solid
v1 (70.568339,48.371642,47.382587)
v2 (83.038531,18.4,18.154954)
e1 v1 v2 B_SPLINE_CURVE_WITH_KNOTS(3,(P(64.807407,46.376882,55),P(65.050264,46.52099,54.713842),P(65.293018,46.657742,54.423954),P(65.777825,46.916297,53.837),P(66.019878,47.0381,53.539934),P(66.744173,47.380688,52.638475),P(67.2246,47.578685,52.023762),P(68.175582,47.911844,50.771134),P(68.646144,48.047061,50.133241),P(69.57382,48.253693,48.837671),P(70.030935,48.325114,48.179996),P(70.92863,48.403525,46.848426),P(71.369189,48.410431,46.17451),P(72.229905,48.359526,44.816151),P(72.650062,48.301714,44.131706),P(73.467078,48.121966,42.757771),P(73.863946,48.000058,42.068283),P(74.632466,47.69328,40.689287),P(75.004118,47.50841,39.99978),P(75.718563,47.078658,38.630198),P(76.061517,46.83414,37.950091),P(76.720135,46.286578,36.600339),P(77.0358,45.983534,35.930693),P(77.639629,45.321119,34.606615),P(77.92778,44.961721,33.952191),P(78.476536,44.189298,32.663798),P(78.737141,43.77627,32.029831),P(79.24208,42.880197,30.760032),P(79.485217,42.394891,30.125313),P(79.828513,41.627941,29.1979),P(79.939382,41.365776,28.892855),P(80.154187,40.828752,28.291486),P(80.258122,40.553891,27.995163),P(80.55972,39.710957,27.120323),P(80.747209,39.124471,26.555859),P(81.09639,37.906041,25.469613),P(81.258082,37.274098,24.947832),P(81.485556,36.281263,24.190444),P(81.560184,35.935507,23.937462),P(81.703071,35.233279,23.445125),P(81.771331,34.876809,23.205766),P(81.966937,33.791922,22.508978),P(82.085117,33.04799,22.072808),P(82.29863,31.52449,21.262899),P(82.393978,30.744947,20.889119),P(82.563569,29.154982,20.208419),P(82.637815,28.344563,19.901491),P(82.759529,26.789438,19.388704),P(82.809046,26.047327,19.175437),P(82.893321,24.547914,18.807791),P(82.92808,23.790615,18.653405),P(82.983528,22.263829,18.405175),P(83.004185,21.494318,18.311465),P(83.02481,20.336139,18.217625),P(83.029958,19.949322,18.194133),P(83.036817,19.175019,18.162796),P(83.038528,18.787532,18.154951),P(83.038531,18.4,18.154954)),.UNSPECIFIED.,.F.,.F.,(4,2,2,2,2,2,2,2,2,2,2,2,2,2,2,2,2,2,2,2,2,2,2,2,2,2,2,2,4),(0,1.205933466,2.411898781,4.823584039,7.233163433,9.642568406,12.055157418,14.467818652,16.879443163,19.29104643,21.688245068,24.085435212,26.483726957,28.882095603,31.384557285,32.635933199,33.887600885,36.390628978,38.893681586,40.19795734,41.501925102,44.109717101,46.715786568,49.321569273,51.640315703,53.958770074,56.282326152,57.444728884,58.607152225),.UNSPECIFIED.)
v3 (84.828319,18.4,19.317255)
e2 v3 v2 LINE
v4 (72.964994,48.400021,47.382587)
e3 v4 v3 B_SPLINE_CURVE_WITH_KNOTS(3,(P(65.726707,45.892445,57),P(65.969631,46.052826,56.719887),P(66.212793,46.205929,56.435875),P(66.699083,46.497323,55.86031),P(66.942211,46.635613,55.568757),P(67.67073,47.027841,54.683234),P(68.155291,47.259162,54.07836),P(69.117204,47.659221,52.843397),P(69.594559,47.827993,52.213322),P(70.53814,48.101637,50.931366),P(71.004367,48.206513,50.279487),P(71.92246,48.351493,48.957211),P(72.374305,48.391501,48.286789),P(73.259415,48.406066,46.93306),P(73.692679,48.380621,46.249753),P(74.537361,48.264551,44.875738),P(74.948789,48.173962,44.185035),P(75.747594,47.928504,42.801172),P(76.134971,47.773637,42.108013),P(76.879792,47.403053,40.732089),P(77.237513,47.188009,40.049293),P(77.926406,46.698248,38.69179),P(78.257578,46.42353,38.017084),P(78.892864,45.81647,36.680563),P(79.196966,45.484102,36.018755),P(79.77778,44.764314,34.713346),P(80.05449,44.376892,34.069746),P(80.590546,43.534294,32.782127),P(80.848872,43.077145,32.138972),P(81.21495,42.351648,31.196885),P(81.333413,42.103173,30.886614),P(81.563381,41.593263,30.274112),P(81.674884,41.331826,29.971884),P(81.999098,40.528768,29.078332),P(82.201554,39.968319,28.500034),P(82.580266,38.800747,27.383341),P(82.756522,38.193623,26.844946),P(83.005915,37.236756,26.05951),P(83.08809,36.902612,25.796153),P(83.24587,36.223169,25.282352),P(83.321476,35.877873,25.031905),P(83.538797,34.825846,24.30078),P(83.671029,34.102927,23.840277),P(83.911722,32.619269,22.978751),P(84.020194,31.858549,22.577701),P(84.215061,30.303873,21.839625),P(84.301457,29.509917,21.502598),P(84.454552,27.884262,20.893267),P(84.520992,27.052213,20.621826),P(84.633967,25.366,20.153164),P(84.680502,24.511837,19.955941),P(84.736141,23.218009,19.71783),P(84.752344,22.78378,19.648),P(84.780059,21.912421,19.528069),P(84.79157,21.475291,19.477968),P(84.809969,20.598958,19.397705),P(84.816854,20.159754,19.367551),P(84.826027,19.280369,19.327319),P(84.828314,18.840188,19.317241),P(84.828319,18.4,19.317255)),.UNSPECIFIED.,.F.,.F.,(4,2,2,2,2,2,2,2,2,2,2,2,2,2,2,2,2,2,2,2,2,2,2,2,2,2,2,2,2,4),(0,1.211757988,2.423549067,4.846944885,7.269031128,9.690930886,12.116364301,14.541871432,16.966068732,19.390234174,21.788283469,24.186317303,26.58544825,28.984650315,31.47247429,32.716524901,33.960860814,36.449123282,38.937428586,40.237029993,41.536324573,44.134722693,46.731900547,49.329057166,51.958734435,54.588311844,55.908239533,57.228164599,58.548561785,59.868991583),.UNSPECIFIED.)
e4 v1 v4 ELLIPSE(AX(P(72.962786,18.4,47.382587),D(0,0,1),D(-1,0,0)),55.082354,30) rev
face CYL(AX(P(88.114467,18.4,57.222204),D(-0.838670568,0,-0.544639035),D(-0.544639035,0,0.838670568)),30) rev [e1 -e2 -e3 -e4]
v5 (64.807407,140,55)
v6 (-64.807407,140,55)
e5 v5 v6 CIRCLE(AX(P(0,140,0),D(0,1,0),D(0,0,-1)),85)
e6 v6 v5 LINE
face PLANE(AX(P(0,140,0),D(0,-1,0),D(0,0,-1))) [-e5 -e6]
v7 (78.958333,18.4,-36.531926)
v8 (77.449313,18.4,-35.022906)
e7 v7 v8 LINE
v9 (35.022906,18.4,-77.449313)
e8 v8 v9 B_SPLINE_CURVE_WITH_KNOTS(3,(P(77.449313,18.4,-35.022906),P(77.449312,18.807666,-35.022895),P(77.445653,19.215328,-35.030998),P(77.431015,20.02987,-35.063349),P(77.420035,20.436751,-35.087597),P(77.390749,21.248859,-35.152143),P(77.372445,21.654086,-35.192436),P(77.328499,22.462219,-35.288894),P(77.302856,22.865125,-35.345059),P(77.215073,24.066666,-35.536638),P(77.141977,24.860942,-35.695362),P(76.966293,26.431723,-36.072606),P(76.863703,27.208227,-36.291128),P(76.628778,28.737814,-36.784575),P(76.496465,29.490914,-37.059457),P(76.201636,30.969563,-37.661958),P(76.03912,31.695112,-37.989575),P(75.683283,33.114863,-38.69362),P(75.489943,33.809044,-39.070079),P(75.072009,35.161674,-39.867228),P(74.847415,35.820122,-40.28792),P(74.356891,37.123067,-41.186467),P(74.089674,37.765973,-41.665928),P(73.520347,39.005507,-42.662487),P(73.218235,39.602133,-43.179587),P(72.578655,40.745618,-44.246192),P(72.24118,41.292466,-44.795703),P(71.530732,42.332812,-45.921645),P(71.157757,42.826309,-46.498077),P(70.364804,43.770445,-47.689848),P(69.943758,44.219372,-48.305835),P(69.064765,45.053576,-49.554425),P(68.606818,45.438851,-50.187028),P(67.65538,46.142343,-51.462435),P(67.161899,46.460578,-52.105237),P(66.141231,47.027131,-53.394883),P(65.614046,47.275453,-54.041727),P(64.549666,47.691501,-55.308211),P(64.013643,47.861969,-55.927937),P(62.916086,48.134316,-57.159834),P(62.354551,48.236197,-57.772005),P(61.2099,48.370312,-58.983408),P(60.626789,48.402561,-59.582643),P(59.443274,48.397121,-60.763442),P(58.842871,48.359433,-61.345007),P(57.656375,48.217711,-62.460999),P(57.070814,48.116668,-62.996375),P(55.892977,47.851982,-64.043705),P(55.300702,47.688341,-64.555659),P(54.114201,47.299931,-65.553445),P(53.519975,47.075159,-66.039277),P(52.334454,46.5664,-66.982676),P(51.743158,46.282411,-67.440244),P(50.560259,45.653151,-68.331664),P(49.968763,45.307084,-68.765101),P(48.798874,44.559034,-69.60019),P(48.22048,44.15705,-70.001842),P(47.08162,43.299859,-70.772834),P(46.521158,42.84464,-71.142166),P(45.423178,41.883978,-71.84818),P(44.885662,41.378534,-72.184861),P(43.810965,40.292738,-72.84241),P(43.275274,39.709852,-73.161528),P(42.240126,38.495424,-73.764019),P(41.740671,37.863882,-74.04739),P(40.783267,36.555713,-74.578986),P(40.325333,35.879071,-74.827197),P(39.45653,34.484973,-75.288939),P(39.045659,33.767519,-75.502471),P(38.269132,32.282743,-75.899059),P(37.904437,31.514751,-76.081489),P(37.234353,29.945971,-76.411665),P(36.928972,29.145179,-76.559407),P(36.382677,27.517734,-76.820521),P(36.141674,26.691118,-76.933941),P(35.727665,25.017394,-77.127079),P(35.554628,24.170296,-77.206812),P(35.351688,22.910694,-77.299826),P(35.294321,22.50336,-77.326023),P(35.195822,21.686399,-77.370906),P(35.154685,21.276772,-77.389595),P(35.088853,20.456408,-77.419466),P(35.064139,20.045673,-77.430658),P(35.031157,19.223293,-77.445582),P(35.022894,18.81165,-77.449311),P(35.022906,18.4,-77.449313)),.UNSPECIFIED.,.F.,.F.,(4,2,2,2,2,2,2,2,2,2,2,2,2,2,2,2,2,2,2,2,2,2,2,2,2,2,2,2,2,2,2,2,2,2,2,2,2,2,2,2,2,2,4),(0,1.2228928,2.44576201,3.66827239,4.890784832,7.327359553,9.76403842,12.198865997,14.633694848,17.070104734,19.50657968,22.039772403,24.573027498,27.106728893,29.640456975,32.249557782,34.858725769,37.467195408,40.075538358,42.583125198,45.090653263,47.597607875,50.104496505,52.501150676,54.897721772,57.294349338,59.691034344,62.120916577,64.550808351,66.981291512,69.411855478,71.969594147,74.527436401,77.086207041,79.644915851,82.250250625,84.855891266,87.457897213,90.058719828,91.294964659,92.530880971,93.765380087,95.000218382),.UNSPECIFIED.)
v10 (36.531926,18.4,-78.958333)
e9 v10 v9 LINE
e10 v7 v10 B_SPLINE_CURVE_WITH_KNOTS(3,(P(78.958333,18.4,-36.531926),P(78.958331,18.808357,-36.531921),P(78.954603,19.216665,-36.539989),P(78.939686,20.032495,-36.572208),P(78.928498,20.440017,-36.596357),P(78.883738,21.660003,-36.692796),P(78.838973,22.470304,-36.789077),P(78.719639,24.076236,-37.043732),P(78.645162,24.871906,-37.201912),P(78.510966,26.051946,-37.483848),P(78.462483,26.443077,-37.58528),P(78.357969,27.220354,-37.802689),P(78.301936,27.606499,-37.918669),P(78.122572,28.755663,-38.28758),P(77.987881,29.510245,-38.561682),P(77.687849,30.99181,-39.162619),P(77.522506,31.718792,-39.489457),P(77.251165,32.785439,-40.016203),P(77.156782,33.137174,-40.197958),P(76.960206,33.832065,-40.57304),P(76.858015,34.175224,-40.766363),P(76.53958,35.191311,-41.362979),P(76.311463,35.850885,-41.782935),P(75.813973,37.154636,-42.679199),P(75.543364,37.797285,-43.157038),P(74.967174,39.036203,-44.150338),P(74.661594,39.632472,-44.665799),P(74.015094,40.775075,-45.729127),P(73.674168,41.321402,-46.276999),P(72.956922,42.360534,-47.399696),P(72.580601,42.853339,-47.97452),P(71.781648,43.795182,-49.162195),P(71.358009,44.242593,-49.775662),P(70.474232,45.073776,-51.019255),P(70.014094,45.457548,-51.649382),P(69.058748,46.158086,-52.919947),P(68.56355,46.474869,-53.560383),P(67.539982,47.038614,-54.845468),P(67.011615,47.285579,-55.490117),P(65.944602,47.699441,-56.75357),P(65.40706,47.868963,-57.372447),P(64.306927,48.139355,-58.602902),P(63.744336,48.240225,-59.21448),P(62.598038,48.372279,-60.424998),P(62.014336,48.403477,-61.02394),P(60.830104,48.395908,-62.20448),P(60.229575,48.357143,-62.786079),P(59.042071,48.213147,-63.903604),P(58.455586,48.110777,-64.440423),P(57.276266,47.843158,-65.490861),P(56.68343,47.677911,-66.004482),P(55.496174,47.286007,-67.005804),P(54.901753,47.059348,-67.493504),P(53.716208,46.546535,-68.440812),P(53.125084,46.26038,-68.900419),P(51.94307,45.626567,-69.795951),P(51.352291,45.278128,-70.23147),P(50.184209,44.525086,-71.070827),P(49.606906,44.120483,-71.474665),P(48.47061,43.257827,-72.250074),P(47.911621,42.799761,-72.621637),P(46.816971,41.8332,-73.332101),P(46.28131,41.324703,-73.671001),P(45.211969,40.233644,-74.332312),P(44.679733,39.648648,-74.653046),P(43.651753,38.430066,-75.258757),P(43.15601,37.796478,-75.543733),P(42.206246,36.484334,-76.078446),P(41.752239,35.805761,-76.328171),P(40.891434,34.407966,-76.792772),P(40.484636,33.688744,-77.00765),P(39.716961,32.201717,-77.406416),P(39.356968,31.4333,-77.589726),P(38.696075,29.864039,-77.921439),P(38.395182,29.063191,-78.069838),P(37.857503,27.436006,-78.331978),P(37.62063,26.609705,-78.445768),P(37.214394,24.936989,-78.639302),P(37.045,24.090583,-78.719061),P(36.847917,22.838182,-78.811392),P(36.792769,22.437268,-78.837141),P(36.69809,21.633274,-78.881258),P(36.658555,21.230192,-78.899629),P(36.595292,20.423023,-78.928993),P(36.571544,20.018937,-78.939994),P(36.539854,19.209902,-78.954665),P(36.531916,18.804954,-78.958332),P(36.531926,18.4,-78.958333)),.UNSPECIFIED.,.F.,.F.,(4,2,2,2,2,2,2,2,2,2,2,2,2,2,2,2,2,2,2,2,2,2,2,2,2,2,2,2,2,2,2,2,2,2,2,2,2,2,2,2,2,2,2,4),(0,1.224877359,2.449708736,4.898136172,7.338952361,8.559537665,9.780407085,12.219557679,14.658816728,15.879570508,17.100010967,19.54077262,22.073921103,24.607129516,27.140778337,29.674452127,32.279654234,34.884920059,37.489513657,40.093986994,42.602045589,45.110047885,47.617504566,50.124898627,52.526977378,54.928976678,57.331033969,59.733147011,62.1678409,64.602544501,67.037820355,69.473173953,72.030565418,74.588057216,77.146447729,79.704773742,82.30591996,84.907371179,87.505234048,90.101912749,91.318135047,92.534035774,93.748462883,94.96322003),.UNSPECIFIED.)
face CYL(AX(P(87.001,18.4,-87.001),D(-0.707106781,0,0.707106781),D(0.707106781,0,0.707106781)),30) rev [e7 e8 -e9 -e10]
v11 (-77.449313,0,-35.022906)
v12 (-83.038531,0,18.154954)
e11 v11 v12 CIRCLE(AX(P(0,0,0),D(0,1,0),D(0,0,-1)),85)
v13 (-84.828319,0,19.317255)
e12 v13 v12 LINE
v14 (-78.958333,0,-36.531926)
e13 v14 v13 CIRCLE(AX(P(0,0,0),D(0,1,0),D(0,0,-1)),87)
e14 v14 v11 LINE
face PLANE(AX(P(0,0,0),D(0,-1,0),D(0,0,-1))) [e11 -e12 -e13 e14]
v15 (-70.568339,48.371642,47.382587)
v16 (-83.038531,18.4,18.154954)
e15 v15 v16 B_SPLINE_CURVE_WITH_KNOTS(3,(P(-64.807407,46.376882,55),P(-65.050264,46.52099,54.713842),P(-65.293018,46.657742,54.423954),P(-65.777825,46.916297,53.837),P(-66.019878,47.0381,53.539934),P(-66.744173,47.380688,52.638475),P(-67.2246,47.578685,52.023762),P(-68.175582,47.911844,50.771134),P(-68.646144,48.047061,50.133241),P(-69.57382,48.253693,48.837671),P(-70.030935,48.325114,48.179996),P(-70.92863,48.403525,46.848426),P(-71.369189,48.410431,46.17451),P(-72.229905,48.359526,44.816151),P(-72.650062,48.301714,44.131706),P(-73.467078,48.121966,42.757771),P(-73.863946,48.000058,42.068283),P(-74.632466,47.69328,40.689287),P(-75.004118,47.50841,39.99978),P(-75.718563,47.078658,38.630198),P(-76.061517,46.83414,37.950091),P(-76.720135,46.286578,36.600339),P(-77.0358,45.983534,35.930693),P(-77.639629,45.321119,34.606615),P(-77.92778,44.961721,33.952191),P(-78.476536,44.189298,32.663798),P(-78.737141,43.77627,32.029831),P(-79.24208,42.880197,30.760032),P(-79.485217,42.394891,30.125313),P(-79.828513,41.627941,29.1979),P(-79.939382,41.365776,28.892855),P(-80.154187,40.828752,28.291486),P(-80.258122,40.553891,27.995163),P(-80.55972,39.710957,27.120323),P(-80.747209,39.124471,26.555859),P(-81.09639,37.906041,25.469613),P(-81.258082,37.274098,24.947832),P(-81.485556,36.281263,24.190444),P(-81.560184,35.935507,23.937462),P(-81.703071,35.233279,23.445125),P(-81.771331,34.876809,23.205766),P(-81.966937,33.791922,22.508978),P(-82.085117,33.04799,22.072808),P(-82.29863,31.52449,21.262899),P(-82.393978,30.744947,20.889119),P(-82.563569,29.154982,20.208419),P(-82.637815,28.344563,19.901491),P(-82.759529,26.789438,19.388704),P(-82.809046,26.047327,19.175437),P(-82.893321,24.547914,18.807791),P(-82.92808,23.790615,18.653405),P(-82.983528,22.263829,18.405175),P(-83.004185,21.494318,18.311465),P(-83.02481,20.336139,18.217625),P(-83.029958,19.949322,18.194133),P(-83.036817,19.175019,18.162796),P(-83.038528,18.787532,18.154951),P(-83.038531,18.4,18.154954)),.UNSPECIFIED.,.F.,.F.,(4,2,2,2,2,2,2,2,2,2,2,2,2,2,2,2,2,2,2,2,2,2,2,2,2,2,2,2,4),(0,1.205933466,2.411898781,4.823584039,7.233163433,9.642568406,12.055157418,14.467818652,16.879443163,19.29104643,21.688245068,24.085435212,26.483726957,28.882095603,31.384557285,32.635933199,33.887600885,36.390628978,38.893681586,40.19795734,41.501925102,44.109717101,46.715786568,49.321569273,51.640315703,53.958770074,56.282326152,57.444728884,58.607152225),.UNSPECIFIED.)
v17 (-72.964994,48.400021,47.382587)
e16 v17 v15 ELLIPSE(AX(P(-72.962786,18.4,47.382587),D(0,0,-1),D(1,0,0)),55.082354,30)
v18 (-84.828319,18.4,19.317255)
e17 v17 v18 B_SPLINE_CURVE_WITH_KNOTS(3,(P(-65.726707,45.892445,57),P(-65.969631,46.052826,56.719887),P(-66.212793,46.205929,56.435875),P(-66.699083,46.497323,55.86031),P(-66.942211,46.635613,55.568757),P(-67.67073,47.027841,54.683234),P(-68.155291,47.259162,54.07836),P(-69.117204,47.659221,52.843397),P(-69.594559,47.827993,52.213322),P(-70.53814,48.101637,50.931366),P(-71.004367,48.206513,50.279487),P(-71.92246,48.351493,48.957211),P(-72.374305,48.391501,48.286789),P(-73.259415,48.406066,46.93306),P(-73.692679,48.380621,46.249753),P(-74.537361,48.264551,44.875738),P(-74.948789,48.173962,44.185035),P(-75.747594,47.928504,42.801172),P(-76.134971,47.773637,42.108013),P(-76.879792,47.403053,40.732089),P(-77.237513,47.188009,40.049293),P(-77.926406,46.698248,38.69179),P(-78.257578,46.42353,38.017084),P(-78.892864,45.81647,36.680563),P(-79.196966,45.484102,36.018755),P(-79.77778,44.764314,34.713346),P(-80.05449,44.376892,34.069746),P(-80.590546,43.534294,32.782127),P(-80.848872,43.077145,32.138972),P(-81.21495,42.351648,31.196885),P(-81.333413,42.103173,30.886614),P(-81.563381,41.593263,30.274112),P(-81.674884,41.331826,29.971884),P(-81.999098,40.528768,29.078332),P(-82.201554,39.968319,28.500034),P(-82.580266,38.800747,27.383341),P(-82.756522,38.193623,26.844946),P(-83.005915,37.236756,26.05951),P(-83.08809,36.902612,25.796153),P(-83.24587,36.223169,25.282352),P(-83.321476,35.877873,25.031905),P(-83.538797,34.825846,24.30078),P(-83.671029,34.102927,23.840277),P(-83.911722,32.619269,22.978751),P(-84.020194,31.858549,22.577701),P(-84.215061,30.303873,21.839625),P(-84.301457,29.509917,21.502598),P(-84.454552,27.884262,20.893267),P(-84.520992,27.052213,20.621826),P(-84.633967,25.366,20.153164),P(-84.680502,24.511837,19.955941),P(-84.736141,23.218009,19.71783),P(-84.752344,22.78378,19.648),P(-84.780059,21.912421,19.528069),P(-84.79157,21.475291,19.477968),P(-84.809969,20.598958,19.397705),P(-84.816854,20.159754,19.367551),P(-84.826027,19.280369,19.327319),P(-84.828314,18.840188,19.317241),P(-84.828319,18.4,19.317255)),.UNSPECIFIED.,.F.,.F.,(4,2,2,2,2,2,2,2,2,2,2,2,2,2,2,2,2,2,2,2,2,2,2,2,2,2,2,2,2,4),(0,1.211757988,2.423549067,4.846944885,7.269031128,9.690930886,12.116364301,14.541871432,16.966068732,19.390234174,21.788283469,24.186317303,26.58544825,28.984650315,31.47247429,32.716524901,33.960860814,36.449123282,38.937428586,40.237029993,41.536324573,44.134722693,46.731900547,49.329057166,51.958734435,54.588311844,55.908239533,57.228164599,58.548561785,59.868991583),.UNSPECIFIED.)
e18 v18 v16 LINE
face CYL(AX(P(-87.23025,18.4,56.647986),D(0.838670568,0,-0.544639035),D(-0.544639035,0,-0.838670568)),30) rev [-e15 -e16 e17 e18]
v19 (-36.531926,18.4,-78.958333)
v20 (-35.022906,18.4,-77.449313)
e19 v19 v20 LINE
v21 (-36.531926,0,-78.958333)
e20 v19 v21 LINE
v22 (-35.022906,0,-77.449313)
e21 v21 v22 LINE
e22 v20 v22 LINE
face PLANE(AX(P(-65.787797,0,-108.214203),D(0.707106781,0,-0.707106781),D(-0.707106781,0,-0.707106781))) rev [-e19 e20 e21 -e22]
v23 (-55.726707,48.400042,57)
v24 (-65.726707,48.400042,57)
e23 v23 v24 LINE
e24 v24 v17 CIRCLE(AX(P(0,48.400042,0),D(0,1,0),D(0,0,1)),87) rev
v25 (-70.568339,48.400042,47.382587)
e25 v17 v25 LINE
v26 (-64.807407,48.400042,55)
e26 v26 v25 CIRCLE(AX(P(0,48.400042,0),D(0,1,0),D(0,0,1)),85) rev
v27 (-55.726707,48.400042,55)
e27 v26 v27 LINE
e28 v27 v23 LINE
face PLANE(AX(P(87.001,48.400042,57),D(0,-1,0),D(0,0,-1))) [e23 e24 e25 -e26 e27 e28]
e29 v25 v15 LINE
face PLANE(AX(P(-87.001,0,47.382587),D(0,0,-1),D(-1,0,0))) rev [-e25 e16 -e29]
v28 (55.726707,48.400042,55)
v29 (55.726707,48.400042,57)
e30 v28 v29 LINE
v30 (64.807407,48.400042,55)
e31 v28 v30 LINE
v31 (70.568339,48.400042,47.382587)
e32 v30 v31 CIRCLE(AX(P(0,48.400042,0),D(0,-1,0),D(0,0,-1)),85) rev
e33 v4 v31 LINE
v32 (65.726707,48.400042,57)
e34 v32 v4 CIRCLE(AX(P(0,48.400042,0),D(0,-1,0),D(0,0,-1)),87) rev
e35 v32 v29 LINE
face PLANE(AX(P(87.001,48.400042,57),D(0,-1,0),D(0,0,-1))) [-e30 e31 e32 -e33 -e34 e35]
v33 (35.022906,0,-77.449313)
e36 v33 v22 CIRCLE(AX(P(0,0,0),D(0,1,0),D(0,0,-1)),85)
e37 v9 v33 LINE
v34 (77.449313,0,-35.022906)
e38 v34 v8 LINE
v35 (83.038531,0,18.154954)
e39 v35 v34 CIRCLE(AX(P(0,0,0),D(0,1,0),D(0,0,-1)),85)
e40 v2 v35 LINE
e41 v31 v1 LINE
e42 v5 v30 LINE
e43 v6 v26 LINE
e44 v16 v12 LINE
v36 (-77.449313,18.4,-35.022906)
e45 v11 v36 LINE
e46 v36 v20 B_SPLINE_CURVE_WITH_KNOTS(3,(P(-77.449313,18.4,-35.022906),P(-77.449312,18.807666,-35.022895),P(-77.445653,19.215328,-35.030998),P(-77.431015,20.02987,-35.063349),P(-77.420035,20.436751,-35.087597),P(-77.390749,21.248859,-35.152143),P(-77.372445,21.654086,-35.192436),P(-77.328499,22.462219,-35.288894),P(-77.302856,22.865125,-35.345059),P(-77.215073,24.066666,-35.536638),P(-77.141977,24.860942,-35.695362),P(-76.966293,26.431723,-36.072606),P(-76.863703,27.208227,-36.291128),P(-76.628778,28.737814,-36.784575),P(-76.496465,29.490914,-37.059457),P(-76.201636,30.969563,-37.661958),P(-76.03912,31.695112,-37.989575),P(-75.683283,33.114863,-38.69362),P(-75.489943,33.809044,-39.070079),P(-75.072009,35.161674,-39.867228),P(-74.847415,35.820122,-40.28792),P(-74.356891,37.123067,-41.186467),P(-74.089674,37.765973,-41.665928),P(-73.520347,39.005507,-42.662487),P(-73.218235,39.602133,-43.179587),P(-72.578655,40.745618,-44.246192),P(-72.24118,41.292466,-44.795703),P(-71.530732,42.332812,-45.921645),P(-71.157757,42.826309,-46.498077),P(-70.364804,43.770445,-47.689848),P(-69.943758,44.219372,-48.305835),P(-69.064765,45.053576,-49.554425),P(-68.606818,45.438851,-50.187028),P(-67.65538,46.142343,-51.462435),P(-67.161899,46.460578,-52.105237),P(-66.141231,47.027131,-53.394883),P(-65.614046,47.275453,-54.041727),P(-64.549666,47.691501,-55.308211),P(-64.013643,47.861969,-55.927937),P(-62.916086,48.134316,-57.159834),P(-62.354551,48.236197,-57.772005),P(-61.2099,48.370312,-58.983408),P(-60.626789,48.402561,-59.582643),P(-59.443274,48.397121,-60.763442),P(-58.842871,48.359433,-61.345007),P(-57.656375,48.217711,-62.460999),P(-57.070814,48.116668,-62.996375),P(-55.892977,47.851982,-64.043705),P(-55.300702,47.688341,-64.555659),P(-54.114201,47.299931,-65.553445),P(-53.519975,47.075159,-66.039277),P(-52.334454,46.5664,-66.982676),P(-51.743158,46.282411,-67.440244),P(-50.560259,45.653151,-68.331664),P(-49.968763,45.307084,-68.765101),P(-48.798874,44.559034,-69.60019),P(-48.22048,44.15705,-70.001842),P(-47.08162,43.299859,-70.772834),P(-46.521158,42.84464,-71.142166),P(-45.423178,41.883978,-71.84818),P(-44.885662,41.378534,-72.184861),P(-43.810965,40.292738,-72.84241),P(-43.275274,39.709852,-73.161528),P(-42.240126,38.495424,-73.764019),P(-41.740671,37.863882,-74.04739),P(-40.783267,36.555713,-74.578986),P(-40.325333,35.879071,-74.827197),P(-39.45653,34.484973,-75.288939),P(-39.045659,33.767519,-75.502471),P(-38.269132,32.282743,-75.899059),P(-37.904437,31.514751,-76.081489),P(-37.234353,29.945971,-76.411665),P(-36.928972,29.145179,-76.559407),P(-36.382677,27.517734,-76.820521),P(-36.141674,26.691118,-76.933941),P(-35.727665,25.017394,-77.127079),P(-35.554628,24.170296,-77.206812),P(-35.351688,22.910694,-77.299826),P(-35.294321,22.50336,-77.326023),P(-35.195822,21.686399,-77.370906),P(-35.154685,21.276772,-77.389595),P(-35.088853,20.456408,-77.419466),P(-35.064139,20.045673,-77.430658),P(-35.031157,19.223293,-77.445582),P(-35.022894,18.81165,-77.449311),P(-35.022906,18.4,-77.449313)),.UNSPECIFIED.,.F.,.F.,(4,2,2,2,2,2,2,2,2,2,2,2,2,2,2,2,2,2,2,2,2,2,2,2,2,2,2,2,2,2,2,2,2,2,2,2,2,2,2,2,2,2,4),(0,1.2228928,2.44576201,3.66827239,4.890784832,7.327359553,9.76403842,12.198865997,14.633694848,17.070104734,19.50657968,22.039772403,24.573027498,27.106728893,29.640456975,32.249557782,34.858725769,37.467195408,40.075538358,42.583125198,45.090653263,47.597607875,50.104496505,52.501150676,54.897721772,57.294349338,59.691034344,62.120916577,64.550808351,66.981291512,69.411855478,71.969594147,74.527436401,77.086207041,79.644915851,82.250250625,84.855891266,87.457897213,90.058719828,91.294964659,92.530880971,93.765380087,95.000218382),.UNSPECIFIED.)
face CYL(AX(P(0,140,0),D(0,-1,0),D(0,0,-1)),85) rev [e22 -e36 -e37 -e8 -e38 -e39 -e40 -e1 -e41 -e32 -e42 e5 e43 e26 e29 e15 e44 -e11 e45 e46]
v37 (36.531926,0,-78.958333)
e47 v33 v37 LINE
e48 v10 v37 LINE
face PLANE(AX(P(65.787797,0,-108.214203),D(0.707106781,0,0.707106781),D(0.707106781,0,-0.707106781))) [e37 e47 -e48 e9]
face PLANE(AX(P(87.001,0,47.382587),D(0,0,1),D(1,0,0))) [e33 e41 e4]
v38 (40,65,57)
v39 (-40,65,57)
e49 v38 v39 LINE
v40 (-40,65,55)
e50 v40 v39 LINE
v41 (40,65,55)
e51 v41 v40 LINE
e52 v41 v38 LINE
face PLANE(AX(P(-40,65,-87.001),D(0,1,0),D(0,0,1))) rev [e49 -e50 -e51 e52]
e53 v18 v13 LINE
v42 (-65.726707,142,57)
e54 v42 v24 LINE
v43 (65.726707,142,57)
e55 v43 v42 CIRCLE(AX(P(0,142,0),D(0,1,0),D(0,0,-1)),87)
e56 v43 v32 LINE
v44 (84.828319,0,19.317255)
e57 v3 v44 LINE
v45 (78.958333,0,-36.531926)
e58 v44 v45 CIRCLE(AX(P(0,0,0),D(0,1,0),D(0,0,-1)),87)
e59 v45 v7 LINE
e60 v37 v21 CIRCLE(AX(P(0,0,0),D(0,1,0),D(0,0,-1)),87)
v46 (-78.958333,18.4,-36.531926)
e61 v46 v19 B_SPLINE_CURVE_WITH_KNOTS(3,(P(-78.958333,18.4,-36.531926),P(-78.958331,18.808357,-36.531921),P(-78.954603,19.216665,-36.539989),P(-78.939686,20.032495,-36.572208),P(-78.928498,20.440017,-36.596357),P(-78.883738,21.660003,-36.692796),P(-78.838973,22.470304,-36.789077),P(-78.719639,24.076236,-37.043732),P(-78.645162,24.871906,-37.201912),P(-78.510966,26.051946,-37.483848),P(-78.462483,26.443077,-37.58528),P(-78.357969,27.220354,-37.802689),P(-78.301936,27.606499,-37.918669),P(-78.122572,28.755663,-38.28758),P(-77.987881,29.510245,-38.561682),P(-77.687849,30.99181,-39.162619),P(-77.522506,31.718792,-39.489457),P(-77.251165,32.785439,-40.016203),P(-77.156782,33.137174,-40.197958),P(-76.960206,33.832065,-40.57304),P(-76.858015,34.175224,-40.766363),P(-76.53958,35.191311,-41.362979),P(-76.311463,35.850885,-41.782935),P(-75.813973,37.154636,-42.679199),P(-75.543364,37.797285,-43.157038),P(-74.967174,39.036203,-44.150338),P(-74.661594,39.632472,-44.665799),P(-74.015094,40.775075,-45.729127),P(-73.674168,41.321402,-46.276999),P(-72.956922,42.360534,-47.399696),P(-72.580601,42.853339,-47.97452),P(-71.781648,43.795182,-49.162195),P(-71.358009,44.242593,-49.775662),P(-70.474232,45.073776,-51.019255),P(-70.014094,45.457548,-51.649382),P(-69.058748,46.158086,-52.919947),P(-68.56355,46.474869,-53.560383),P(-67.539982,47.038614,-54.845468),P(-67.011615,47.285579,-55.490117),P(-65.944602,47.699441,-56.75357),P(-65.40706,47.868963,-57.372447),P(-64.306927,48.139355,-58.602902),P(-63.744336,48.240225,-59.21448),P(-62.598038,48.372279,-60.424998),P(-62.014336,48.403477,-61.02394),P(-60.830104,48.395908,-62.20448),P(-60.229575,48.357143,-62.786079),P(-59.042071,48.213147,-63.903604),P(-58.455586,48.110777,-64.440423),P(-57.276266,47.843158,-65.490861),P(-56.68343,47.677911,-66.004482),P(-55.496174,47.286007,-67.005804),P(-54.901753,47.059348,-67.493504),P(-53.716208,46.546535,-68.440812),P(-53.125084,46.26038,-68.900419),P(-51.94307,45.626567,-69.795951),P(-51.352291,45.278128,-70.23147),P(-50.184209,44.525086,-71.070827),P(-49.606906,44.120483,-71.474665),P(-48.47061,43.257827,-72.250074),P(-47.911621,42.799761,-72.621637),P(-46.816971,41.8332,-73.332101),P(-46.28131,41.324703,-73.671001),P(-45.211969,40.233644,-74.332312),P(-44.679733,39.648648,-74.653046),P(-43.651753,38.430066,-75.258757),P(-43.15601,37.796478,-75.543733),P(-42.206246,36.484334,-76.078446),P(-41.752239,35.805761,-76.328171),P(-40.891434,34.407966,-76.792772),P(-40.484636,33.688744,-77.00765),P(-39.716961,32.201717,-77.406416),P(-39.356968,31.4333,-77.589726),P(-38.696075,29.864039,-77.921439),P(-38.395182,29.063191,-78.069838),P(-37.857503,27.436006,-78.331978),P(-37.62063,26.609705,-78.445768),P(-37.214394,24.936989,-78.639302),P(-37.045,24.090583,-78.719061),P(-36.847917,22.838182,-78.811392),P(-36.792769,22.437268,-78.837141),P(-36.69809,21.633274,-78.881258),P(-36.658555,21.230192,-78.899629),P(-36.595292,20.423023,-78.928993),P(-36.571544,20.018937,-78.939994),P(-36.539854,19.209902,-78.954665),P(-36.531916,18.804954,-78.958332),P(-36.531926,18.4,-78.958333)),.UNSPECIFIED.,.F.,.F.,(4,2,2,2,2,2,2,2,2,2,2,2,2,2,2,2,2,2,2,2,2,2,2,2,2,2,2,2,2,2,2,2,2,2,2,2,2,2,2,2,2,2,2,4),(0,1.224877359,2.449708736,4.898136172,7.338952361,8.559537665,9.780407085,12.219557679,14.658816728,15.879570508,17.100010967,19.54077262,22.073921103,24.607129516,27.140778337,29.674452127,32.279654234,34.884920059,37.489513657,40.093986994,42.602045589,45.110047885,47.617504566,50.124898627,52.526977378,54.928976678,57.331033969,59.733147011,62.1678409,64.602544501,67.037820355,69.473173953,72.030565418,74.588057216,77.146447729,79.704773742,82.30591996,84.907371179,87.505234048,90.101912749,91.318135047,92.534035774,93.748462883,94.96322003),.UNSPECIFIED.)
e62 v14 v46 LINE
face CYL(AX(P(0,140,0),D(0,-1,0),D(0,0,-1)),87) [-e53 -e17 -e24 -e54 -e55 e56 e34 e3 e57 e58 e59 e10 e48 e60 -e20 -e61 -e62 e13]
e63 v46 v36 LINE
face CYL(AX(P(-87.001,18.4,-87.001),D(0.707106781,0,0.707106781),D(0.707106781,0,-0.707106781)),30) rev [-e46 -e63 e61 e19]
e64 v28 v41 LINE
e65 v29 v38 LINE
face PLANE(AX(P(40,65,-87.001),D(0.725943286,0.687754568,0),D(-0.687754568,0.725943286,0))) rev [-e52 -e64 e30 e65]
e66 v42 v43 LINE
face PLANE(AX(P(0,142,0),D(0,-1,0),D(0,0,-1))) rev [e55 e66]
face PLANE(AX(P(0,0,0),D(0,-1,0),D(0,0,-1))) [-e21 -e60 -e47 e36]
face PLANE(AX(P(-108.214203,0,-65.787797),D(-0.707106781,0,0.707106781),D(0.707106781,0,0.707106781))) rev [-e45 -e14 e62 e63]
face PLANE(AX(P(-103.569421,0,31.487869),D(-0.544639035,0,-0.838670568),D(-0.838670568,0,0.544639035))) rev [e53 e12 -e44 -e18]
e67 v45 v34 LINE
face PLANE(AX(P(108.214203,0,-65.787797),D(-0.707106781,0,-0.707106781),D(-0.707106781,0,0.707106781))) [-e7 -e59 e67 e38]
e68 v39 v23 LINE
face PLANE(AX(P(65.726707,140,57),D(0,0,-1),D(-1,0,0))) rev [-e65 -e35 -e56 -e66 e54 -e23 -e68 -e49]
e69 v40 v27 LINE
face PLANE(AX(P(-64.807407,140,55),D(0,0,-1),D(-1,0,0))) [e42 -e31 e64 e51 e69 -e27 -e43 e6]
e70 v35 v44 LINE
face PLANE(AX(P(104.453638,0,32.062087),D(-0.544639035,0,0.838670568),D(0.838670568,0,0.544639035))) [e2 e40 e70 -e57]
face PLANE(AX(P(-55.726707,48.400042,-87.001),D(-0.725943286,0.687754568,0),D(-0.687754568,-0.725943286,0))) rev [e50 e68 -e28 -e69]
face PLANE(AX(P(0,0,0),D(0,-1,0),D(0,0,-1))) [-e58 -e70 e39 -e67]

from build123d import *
from build123d.topology import SkipClean

# Parameters (mm, degrees)
BOSS_EXTRUDE1_DEPTH       = 140
BOSS_EXTRUDE2_DEPTH       = 2
CUT_EXTRUDE1_REACH        = 189.888
CUT_EXTRUDE1_END_RADIUS   = 87
CIRPATTERN1_COUNT         = 2
CIRPATTERN1_ANGLE         = 78
MIRROR1_COPY_1_REACH      = 189.888
MIRROR1_COPY_1_END_RADIUS = 87
CUT_EXTRUDE3_START        = -72.96499449
CUT_EXTRUDE3_OUTLINE_W    = 9.617412702
CUT_EXTRUDE3_OUTLINE_H    = 48.400041505
CUT_EXTRUDE3_DEPTH        = 145.92998898
CUT_EXTRUDE2_START        = -2
CUT_EXTRUDE2_DEPTH        = 2


# Read off the part's stored shape, not the designer's step: Cut-Extrude3, Cut-Extrude2
with BuildPart() as part:
    # Sketch1 → Boss-Extrude1 (new body)
    with BuildSketch(Plane(origin=(0, 0, 0), x_dir=(1, 0, 0), z_dir=(0, 1, 0))):
        with BuildLine():
            Line((65.726706901, -57), (-65.726706901, -57))
            ThreePointArc((-65.726706901, -57), (0, 87), (65.726706901, -57))
        make_face()
        with BuildLine():
            Line((-64.807406984, -55), (64.807406984, -55))
            ThreePointArc((64.807406984, -55), (0, 85), (-64.807406984, -55))
        make_face(mode=Mode.SUBTRACT)
    extrude(amount=BOSS_EXTRUDE1_DEPTH)

    # Sketch2 → Boss-Extrude2 (add)
    with SkipClean():  # the faces are left unmerged after this step: merging them gives an invalid solid
        with BuildSketch(Plane(origin=(0, 140, 0), x_dir=(1, 0, 0), z_dir=(0, 1, 0))):
            with BuildLine():
                Line((-65.726706901, -57), (65.726706901, -57))
                ThreePointArc((65.726706901, -57), (0, 87), (-65.726706901, -57))
            make_face()
        extrude(amount=BOSS_EXTRUDE2_DEPTH)

    # Cut-Extrude1: up to this cylinder (the profile starts inside it)
    with SkipClean():  # the faces are left unmerged after this step: merging them gives an invalid solid
        cut_extrude1_end = Plane(origin=(0, 9.2, 0), z_dir=(0, -1, 0)) * Cylinder(CUT_EXTRUDE1_END_RADIUS, 554.776, mode=Mode.PRIVATE)
        # Sketch3 → Cut-Extrude1 (cut, up to the surface)
        with BuildSketch(Plane(origin=(0, 0, 0), x_dir=(0.7071067811865464, 0, -0.7071067811865488), z_dir=(0.7071067811865488, 0, 0.7071067811865464)), mode=Mode.PRIVATE) as cut_extrude1_sk1:
            with BuildLine():
                Line((-30, 0), (-30, 18.4))
                ThreePointArc((-30, 18.4), (0, 48.4), (30, 18.4))
                Line((30, 18.4), (30, 0))
                ThreePointArc((30, 0), (0, -30), (-30, 0))
            make_face()
        cut_extrude1_tool1 = extrude(cut_extrude1_sk1.sketch, amount=-CUT_EXTRUDE1_REACH, mode=Mode.PRIVATE) & cut_extrude1_end
        cut_extrude1 = cut_extrude1_tool1.solids().sort_by_distance((0, 9.2, 0))[0]
        add(cut_extrude1, mode=Mode.SUBTRACT)

    # CirPattern1: Cut-Extrude1 ×2 about axis
    with SkipClean():  # the faces are left unmerged after this step: merging them gives an invalid solid
        cirpattern1_axis = Axis((0, 140, 0), (0, 1, 0))
        for i in range(1, CIRPATTERN1_COUNT):
            add(cut_extrude1.rotate(cirpattern1_axis, i * CIRPATTERN1_ANGLE / (CIRPATTERN1_COUNT - 1)), mode=Mode.SUBTRACT)

    # Mirror1: Cut-Extrude1 across plane
    with SkipClean():  # the faces are left unmerged after this step: merging them gives an invalid solid
        add(cut_extrude1.mirror(Plane(origin=(0, 0, 0), x_dir=(0, 0, 1), z_dir=(1, 0, 0))), mode=Mode.SUBTRACT)

    # Mirror1 copy 1: up to this cylinder (the profile starts inside it)
    with SkipClean():  # the faces are left unmerged after this step: merging them gives an invalid solid
        mirror1_copy_1_end = Plane(origin=(0, 9.2, 0), z_dir=(0, -1, 0)) * Cylinder(MIRROR1_COPY_1_END_RADIUS, 554.776, mode=Mode.PRIVATE)
        # Mirror1 copy 1 sketch → Mirror1 copy 1 (cut, up to the surface)
        with BuildSketch(Plane(origin=(0, 0, 0), x_dir=(0.544639035015031, 0, -0.8386705679454215), z_dir=(-0.8386705679454215, 0, -0.544639035015031)), mode=Mode.PRIVATE) as mirror1_copy_1_sk1:
            with BuildLine():
                Line((-30, 0), (-30, -18.4))
                ThreePointArc((-30, -18.4), (0, -48.4), (30, -18.4))
                Line((30, -18.4), (30, 0))
                ThreePointArc((30, 0), (0, 30), (-30, 0))
            make_face()
        mirror1_copy_1_tool1 = extrude(mirror1_copy_1_sk1.sketch, amount=-MIRROR1_COPY_1_REACH, mode=Mode.PRIVATE) & mirror1_copy_1_end
        add(mirror1_copy_1_tool1.solids().sort_by_distance((0, 9.2, 0))[0], mode=Mode.SUBTRACT)

    # Cut-Extrude3 outline → Cut-Extrude3 (cut)
    with SkipClean():  # the faces are left unmerged after this step: merging them gives an invalid solid
        with BuildSketch(Plane(origin=(0, 0, 0), x_dir=(0, 0, -1), z_dir=(1, 0, 0)).offset(CUT_EXTRUDE3_START)):
            with Locations((-52.191293649, 24.200020753)):
                Rectangle(CUT_EXTRUDE3_OUTLINE_W, CUT_EXTRUDE3_OUTLINE_H)
        extrude(amount=CUT_EXTRUDE3_DEPTH, mode=Mode.SUBTRACT)

    # Cut-Extrude2 outline → Cut-Extrude2 (cut)
    with SkipClean():  # the faces are left unmerged after this step: merging them gives an invalid solid
        with BuildSketch(Plane.XY.offset(57).offset(CUT_EXTRUDE2_START)):
            Polygon((-55.726706901, 48.400041505), (55.726706901, 48.400041505), (40, 65), (-40, 65), align=None)
        extrude(amount=CUT_EXTRUDE2_DEPTH, mode=Mode.SUBTRACT)


solid = part.part
